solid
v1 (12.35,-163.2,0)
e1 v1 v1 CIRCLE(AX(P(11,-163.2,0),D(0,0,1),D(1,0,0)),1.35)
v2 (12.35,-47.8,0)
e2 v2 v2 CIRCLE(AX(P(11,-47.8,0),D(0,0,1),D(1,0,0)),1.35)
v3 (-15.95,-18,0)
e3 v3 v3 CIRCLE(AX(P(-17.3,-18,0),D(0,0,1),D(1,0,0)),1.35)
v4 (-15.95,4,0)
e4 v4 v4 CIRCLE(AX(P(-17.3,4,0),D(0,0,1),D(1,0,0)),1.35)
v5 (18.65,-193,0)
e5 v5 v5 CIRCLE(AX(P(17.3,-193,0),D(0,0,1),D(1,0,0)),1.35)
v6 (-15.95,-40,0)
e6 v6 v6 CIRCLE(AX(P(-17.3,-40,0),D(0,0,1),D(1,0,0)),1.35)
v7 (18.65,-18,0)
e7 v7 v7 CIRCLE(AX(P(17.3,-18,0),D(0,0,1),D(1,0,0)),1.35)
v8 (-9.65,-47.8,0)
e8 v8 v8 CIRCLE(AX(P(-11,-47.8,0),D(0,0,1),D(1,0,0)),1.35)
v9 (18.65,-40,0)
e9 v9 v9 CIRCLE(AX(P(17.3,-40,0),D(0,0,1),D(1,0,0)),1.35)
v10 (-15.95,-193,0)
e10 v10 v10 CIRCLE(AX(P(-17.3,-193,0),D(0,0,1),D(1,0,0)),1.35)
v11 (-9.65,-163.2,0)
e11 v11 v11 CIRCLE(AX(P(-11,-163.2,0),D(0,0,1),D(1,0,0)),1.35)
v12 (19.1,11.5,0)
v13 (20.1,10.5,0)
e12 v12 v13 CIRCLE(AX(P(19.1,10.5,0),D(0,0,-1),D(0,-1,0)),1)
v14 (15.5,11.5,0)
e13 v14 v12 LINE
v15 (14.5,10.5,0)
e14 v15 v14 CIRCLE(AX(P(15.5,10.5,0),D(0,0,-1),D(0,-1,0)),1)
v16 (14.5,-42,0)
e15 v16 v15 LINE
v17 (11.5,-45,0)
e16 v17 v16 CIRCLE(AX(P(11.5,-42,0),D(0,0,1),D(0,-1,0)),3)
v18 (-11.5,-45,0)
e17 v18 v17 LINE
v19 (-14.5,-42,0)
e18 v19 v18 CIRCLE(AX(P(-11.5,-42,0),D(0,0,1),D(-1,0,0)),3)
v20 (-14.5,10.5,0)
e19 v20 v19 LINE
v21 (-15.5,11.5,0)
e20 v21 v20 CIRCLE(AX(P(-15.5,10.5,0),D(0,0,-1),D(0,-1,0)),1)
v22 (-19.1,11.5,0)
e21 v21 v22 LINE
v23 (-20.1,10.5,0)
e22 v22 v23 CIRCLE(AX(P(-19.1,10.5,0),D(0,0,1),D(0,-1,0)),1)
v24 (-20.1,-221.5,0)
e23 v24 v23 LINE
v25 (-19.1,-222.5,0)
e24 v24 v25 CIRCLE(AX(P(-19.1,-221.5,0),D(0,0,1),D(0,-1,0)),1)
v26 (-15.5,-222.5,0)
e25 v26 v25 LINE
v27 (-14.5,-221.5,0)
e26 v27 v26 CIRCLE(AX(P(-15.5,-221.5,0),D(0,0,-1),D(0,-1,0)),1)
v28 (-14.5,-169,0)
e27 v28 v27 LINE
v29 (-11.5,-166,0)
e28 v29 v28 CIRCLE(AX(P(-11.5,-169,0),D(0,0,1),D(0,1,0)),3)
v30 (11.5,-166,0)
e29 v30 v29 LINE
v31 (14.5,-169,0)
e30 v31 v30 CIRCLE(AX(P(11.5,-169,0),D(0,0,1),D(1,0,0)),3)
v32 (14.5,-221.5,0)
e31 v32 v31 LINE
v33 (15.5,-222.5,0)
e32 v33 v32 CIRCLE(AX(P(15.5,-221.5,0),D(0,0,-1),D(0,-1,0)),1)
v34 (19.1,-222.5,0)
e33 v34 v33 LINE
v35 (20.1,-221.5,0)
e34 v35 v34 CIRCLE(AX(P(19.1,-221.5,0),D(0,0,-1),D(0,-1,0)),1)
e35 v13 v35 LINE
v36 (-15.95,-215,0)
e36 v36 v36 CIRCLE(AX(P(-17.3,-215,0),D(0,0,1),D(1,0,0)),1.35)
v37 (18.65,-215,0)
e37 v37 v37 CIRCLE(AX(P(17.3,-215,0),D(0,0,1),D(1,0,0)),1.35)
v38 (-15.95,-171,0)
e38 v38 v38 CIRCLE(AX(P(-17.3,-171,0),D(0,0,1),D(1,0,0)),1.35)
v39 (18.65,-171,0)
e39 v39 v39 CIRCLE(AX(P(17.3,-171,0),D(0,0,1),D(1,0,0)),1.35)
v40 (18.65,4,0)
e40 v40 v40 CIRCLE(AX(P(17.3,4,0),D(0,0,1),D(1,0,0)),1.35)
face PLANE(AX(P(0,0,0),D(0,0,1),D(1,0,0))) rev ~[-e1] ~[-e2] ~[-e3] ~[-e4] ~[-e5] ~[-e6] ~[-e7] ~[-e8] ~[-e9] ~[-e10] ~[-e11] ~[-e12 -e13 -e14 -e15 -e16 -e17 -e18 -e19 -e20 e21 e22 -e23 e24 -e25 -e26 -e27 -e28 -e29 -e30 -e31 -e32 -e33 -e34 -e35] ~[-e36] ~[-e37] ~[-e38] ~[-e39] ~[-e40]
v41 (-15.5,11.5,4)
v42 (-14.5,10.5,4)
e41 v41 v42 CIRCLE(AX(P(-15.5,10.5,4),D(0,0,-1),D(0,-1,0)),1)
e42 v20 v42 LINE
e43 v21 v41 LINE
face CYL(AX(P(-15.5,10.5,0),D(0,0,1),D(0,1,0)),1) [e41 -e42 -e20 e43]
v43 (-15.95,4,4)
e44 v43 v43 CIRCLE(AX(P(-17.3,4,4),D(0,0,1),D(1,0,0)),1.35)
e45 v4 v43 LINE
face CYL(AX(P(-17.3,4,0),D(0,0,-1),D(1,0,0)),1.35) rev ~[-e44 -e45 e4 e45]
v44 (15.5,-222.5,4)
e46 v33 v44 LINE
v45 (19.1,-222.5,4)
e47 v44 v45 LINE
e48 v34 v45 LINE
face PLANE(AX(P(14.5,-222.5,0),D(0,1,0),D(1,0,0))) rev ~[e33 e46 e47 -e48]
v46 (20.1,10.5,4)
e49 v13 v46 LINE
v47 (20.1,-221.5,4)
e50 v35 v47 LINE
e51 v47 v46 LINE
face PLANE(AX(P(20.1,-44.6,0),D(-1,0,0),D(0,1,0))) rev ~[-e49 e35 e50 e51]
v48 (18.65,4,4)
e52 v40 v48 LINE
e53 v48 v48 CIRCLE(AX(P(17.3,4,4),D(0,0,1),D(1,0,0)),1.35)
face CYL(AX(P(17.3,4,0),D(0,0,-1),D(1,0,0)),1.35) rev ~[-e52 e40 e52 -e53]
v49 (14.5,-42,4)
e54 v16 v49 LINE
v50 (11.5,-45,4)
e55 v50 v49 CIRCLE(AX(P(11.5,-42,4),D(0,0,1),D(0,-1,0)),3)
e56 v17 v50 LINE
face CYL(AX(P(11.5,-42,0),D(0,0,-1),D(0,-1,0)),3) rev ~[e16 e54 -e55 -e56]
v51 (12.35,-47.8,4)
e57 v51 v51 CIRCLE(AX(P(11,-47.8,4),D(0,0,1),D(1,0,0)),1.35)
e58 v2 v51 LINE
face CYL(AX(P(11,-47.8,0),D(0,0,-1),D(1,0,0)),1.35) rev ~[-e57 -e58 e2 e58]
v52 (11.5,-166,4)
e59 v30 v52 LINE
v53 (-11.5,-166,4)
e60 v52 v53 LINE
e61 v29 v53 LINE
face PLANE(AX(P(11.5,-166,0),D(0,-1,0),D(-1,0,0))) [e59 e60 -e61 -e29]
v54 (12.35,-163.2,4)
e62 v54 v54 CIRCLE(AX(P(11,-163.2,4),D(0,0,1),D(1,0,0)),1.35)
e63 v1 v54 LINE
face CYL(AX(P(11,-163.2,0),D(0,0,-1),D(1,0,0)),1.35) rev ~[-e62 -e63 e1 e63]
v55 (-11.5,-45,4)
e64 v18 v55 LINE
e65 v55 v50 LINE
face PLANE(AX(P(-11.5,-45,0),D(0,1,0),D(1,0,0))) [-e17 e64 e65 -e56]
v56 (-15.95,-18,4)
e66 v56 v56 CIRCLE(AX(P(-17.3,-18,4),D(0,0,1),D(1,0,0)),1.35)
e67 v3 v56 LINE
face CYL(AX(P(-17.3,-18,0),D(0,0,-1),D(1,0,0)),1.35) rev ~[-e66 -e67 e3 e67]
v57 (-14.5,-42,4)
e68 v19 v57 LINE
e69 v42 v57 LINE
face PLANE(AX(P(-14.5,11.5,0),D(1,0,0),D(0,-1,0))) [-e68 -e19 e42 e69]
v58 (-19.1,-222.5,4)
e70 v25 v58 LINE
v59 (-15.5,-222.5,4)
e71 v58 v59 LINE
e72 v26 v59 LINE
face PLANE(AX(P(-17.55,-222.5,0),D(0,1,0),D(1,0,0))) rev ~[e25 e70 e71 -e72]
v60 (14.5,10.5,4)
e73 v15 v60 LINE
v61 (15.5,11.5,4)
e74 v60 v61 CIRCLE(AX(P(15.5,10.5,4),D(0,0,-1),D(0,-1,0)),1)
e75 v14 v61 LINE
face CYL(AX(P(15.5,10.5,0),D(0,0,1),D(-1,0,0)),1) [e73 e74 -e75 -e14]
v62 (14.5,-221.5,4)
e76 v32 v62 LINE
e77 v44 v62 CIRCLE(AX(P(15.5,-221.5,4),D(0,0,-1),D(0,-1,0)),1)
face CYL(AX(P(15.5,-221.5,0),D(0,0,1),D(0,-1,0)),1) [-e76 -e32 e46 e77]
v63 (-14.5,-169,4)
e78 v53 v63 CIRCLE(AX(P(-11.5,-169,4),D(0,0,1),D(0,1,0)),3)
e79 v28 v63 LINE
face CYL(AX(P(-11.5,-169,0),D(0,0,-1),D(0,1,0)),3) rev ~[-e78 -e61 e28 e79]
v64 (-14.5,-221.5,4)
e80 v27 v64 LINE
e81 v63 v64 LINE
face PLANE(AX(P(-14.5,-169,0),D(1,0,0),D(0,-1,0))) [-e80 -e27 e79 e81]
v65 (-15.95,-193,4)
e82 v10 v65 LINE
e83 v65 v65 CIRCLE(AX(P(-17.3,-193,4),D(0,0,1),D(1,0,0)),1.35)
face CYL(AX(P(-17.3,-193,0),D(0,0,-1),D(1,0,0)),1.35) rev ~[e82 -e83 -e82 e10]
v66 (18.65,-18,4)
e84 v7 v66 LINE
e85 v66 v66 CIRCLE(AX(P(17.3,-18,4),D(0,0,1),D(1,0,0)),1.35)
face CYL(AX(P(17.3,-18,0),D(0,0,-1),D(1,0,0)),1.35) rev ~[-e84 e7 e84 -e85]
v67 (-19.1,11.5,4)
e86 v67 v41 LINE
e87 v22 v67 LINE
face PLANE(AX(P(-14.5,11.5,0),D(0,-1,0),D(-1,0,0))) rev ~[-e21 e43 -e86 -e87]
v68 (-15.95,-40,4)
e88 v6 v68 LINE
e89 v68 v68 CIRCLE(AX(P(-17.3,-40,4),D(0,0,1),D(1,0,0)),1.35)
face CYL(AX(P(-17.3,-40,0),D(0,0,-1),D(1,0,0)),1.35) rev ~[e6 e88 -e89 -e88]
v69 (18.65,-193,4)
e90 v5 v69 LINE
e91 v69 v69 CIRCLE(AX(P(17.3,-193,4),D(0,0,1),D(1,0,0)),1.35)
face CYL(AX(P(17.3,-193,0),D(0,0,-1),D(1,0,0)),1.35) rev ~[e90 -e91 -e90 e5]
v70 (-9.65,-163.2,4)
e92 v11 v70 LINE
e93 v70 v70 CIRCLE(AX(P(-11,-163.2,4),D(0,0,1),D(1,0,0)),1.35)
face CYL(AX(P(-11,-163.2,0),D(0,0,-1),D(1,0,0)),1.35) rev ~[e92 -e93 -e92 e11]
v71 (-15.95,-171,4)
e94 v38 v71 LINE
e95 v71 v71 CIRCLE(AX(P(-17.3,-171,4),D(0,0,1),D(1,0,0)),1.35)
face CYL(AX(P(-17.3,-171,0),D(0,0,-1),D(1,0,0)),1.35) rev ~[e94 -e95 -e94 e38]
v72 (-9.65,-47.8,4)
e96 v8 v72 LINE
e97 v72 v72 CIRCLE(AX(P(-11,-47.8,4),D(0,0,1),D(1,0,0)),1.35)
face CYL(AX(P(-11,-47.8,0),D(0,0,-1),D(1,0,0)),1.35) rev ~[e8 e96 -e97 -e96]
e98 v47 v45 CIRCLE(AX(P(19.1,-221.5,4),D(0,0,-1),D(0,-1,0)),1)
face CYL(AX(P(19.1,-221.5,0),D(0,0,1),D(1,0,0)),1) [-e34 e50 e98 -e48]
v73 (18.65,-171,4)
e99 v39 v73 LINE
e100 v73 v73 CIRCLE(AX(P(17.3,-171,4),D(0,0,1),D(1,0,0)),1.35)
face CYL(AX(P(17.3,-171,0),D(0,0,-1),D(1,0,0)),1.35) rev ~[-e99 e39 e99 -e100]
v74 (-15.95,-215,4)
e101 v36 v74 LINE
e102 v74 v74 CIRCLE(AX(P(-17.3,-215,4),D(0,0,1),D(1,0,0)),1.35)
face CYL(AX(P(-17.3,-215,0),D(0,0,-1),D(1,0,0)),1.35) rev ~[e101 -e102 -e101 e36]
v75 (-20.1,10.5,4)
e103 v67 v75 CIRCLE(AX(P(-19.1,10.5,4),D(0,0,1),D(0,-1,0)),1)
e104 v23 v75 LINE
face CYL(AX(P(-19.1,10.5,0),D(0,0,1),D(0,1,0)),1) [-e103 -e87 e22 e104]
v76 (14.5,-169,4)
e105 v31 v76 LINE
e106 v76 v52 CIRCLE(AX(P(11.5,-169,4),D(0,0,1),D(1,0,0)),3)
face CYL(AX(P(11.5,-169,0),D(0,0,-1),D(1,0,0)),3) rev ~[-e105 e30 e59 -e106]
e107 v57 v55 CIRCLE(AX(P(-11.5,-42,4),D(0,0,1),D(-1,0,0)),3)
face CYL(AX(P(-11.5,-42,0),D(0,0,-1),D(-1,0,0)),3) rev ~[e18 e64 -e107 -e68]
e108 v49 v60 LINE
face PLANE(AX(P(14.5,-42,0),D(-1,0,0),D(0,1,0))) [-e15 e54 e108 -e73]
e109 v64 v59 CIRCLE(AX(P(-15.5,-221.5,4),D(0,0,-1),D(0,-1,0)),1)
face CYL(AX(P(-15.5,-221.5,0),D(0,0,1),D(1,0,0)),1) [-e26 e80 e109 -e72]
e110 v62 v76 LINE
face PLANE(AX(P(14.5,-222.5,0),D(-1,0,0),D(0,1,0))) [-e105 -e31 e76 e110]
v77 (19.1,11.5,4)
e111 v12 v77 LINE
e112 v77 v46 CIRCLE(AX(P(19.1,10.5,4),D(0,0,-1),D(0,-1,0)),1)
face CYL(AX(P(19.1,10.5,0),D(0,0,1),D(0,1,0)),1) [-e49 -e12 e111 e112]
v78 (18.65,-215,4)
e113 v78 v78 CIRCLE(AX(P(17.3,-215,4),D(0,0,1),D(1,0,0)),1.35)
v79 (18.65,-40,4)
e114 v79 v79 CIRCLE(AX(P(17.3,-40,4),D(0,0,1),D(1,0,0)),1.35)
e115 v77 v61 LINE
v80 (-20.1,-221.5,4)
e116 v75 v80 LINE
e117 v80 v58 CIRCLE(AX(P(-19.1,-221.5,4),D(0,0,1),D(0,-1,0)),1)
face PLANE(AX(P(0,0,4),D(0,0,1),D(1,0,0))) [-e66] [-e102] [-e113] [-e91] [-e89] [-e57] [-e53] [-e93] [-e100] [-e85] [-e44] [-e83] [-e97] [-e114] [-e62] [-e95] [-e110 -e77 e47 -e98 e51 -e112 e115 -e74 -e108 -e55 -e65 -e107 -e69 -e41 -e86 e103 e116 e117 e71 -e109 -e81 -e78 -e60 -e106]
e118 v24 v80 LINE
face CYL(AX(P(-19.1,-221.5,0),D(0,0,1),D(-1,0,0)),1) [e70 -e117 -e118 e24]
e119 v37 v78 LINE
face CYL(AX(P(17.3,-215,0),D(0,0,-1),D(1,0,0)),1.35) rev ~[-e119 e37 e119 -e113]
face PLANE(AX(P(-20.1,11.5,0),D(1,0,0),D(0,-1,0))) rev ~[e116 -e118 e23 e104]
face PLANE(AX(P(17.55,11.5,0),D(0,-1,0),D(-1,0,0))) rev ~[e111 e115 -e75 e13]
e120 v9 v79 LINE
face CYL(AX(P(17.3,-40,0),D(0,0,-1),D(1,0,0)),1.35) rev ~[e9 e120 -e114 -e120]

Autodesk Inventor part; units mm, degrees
ref_plane "YZ Plane" through (0, 0, 0) normal (1, 0, 0) x (0, 1, 0)
ref_plane "XZ Plane" through (0, 0, 0) normal (0, 1, 0) x (-1, 0, 0)
ref_plane "XY Plane" through (0, 0, 0) normal (0, 0, 1) x (1, 0, 0)
sketch "스케치1" plane through (0, 0, 0) normal (0, 0, 1) x (1, 0, 0)
  line L0 (-15, 14.5) -> (-11.5, 14.5)
  line L1 (-15, 14.5) -> (-20.1, 8.5)
  line L2 (-20.1, 8.5) -> (-20.1, -44.6)
  line L3 (-20.1, -44.6) -> (-15, -50.6)
  line L4 (-15, -50.6) -> (15, -50.6)
  line L5 (15, -50.6) -> (20.1, -44.6)
  line L6 (20.1, -44.6) -> (20.1, 8.5)
  line L7 (20.1, 8.5) -> (15, 14.5)
  line L8 (11.5, 14.5) -> (15, 14.5)
  arc A0 (14.5, 11.5) -> (11.5, 14.5) centre (11.5, 11.5) ccw
  line L9 (14.5, -42) -> (14.5, 11.5)
  arc A1 (11.5, -45) -> (14.5, -42) centre (11.5, -42) ccw
  line L10 (-11.5, -45) -> (11.5, -45)
  arc A2 (-14.5, -42) -> (-11.5, -45) centre (-11.5, -42) ccw
  line L11 (-14.5, 11.5) -> (-14.5, -42)
  arc A3 (-11.5, 14.5) -> (-14.5, 11.5) centre (-11.5, 11.5) ccw
  circle A4 centre (-17.3, 4) radius 1.35
  circle A5 centre (-17.3, -18) radius 1.35
  circle A6 centre (-11, -47.8) radius 1.35
  circle A7 centre (17.3, 4) radius 1.35
  circle A8 centre (17.3, -18) radius 1.35
  circle A9 centre (11, -47.8) radius 1.35
  circle A10 centre (-17.3, -40) radius 1.35
  circle A11 centre (17.3, -40) radius 1.35
  line L12 (15, -225.5) -> (11.5, -225.5)
  line L13 (15, -225.5) -> (20.1, -219.5)
  line L14 (20.1, -219.5) -> (20.1, -166.4)
  line L15 (20.1, -166.4) -> (15, -160.4)
  line L16 (15, -160.4) -> (-15, -160.4)
  line L17 (-15, -160.4) -> (-20.1, -166.4)
  line L18 (-20.1, -166.4) -> (-20.1, -219.5)
  line L19 (-20.1, -219.5) -> (-15, -225.5)
  line L20 (-11.5, -225.5) -> (-15, -225.5)
  arc A12 (-14.5, -222.5) -> (-11.5, -225.5) centre (-11.5, -222.5) ccw
  line L21 (-14.5, -169) -> (-14.5, -222.5)
  arc A13 (-11.5, -166) -> (-14.5, -169) centre (-11.5, -169) ccw
  line L22 (11.5, -166) -> (-11.5, -166)
  arc A14 (14.5, -169) -> (11.5, -166) centre (11.5, -169) ccw
  line L23 (14.5, -222.5) -> (14.5, -169)
  arc A15 (11.5, -225.5) -> (14.5, -222.5) centre (11.5, -222.5) ccw
  circle A16 centre (17.3, -215) radius 1.35
  circle A17 centre (17.3, -193) radius 1.35
  circle A18 centre (11, -163.2) radius 1.35
  circle A19 centre (-17.3, -215) radius 1.35
  circle A20 centre (-17.3, -193) radius 1.35
  circle A21 centre (-11, -163.2) radius 1.35
  circle A22 centre (17.3, -171) radius 1.35
  circle A23 centre (-17.3, -171) radius 1.35
  line L24 (20.1, -222.5) -> (20.1, 11.5)
  line L25 (-20.1, 11.5) -> (-20.1, -222.5)
  line L26 (14.5, -222.5) -> (14.5, -169)
  line L27 (11.5, -166) -> (-11.5, -166)
  line L28 (-14.5, -169) -> (-14.5, -222.5)
  arc A24 (14.5, -169) -> (11.5, -166) centre (11.5, -169) ccw
  arc A25 (-11.5, -166) -> (-14.5, -169) centre (-11.5, -169) ccw
  arc A26 (11.5, -45) -> (14.5, -42) centre (11.5, -42) ccw
  arc A27 (-14.5, -42) -> (-11.5, -45) centre (-11.5, -42) ccw
  line L29 (11.5, -45) -> (-11.5, -45)
  line L30 (-14.5, -42) -> (-14.5, 11.5)
  line L31 (14.5, 11.5) -> (14.5, -42)
  line L32 (20.1, 11.5) -> (14.5, 11.5)
  line L33 (-14.5, 11.5) -> (-20.1, 11.5)
  line L34 (-20.1, -222.5) -> (-14.5, -222.5)
  line L35 (14.5, -222.5) -> (20.1, -222.5)
  point P0 (0, 0)
  dimension "d0" = 3
extrude "판1" add sketch "스케치1" along normal blind 4 contours L33 L11 A2 L10 A1 L9 L32 L7 L6 L5 L4 L3 L2 L1 | L1 L25 L33 | L3 L4 L5 L24 L15 L16 L17 L25 | L17 L16 L15 L14 L13 L35 L23 A14 L22 A13 L21 L34 L19 L18 | L19 L34 L25 | L7 L32 L24 | L24 L35 L13
fillet "모서리 라운드1" radius 1 8 edges at (14.5, -222.5, 2) (20.1, -222.5, 2) (-14.5, -222.5, 2) (-20.1, -222.5, 2) (-20.1, 11.5, 2) (-14.5, 11.5, 2) (14.5, 11.5, 2) (20.1, 11.5, 2)
equation "\"TransitionRadius\" = BendRadius"
equation "\"BendRadius\" = 4"
properties part number "bar1"
